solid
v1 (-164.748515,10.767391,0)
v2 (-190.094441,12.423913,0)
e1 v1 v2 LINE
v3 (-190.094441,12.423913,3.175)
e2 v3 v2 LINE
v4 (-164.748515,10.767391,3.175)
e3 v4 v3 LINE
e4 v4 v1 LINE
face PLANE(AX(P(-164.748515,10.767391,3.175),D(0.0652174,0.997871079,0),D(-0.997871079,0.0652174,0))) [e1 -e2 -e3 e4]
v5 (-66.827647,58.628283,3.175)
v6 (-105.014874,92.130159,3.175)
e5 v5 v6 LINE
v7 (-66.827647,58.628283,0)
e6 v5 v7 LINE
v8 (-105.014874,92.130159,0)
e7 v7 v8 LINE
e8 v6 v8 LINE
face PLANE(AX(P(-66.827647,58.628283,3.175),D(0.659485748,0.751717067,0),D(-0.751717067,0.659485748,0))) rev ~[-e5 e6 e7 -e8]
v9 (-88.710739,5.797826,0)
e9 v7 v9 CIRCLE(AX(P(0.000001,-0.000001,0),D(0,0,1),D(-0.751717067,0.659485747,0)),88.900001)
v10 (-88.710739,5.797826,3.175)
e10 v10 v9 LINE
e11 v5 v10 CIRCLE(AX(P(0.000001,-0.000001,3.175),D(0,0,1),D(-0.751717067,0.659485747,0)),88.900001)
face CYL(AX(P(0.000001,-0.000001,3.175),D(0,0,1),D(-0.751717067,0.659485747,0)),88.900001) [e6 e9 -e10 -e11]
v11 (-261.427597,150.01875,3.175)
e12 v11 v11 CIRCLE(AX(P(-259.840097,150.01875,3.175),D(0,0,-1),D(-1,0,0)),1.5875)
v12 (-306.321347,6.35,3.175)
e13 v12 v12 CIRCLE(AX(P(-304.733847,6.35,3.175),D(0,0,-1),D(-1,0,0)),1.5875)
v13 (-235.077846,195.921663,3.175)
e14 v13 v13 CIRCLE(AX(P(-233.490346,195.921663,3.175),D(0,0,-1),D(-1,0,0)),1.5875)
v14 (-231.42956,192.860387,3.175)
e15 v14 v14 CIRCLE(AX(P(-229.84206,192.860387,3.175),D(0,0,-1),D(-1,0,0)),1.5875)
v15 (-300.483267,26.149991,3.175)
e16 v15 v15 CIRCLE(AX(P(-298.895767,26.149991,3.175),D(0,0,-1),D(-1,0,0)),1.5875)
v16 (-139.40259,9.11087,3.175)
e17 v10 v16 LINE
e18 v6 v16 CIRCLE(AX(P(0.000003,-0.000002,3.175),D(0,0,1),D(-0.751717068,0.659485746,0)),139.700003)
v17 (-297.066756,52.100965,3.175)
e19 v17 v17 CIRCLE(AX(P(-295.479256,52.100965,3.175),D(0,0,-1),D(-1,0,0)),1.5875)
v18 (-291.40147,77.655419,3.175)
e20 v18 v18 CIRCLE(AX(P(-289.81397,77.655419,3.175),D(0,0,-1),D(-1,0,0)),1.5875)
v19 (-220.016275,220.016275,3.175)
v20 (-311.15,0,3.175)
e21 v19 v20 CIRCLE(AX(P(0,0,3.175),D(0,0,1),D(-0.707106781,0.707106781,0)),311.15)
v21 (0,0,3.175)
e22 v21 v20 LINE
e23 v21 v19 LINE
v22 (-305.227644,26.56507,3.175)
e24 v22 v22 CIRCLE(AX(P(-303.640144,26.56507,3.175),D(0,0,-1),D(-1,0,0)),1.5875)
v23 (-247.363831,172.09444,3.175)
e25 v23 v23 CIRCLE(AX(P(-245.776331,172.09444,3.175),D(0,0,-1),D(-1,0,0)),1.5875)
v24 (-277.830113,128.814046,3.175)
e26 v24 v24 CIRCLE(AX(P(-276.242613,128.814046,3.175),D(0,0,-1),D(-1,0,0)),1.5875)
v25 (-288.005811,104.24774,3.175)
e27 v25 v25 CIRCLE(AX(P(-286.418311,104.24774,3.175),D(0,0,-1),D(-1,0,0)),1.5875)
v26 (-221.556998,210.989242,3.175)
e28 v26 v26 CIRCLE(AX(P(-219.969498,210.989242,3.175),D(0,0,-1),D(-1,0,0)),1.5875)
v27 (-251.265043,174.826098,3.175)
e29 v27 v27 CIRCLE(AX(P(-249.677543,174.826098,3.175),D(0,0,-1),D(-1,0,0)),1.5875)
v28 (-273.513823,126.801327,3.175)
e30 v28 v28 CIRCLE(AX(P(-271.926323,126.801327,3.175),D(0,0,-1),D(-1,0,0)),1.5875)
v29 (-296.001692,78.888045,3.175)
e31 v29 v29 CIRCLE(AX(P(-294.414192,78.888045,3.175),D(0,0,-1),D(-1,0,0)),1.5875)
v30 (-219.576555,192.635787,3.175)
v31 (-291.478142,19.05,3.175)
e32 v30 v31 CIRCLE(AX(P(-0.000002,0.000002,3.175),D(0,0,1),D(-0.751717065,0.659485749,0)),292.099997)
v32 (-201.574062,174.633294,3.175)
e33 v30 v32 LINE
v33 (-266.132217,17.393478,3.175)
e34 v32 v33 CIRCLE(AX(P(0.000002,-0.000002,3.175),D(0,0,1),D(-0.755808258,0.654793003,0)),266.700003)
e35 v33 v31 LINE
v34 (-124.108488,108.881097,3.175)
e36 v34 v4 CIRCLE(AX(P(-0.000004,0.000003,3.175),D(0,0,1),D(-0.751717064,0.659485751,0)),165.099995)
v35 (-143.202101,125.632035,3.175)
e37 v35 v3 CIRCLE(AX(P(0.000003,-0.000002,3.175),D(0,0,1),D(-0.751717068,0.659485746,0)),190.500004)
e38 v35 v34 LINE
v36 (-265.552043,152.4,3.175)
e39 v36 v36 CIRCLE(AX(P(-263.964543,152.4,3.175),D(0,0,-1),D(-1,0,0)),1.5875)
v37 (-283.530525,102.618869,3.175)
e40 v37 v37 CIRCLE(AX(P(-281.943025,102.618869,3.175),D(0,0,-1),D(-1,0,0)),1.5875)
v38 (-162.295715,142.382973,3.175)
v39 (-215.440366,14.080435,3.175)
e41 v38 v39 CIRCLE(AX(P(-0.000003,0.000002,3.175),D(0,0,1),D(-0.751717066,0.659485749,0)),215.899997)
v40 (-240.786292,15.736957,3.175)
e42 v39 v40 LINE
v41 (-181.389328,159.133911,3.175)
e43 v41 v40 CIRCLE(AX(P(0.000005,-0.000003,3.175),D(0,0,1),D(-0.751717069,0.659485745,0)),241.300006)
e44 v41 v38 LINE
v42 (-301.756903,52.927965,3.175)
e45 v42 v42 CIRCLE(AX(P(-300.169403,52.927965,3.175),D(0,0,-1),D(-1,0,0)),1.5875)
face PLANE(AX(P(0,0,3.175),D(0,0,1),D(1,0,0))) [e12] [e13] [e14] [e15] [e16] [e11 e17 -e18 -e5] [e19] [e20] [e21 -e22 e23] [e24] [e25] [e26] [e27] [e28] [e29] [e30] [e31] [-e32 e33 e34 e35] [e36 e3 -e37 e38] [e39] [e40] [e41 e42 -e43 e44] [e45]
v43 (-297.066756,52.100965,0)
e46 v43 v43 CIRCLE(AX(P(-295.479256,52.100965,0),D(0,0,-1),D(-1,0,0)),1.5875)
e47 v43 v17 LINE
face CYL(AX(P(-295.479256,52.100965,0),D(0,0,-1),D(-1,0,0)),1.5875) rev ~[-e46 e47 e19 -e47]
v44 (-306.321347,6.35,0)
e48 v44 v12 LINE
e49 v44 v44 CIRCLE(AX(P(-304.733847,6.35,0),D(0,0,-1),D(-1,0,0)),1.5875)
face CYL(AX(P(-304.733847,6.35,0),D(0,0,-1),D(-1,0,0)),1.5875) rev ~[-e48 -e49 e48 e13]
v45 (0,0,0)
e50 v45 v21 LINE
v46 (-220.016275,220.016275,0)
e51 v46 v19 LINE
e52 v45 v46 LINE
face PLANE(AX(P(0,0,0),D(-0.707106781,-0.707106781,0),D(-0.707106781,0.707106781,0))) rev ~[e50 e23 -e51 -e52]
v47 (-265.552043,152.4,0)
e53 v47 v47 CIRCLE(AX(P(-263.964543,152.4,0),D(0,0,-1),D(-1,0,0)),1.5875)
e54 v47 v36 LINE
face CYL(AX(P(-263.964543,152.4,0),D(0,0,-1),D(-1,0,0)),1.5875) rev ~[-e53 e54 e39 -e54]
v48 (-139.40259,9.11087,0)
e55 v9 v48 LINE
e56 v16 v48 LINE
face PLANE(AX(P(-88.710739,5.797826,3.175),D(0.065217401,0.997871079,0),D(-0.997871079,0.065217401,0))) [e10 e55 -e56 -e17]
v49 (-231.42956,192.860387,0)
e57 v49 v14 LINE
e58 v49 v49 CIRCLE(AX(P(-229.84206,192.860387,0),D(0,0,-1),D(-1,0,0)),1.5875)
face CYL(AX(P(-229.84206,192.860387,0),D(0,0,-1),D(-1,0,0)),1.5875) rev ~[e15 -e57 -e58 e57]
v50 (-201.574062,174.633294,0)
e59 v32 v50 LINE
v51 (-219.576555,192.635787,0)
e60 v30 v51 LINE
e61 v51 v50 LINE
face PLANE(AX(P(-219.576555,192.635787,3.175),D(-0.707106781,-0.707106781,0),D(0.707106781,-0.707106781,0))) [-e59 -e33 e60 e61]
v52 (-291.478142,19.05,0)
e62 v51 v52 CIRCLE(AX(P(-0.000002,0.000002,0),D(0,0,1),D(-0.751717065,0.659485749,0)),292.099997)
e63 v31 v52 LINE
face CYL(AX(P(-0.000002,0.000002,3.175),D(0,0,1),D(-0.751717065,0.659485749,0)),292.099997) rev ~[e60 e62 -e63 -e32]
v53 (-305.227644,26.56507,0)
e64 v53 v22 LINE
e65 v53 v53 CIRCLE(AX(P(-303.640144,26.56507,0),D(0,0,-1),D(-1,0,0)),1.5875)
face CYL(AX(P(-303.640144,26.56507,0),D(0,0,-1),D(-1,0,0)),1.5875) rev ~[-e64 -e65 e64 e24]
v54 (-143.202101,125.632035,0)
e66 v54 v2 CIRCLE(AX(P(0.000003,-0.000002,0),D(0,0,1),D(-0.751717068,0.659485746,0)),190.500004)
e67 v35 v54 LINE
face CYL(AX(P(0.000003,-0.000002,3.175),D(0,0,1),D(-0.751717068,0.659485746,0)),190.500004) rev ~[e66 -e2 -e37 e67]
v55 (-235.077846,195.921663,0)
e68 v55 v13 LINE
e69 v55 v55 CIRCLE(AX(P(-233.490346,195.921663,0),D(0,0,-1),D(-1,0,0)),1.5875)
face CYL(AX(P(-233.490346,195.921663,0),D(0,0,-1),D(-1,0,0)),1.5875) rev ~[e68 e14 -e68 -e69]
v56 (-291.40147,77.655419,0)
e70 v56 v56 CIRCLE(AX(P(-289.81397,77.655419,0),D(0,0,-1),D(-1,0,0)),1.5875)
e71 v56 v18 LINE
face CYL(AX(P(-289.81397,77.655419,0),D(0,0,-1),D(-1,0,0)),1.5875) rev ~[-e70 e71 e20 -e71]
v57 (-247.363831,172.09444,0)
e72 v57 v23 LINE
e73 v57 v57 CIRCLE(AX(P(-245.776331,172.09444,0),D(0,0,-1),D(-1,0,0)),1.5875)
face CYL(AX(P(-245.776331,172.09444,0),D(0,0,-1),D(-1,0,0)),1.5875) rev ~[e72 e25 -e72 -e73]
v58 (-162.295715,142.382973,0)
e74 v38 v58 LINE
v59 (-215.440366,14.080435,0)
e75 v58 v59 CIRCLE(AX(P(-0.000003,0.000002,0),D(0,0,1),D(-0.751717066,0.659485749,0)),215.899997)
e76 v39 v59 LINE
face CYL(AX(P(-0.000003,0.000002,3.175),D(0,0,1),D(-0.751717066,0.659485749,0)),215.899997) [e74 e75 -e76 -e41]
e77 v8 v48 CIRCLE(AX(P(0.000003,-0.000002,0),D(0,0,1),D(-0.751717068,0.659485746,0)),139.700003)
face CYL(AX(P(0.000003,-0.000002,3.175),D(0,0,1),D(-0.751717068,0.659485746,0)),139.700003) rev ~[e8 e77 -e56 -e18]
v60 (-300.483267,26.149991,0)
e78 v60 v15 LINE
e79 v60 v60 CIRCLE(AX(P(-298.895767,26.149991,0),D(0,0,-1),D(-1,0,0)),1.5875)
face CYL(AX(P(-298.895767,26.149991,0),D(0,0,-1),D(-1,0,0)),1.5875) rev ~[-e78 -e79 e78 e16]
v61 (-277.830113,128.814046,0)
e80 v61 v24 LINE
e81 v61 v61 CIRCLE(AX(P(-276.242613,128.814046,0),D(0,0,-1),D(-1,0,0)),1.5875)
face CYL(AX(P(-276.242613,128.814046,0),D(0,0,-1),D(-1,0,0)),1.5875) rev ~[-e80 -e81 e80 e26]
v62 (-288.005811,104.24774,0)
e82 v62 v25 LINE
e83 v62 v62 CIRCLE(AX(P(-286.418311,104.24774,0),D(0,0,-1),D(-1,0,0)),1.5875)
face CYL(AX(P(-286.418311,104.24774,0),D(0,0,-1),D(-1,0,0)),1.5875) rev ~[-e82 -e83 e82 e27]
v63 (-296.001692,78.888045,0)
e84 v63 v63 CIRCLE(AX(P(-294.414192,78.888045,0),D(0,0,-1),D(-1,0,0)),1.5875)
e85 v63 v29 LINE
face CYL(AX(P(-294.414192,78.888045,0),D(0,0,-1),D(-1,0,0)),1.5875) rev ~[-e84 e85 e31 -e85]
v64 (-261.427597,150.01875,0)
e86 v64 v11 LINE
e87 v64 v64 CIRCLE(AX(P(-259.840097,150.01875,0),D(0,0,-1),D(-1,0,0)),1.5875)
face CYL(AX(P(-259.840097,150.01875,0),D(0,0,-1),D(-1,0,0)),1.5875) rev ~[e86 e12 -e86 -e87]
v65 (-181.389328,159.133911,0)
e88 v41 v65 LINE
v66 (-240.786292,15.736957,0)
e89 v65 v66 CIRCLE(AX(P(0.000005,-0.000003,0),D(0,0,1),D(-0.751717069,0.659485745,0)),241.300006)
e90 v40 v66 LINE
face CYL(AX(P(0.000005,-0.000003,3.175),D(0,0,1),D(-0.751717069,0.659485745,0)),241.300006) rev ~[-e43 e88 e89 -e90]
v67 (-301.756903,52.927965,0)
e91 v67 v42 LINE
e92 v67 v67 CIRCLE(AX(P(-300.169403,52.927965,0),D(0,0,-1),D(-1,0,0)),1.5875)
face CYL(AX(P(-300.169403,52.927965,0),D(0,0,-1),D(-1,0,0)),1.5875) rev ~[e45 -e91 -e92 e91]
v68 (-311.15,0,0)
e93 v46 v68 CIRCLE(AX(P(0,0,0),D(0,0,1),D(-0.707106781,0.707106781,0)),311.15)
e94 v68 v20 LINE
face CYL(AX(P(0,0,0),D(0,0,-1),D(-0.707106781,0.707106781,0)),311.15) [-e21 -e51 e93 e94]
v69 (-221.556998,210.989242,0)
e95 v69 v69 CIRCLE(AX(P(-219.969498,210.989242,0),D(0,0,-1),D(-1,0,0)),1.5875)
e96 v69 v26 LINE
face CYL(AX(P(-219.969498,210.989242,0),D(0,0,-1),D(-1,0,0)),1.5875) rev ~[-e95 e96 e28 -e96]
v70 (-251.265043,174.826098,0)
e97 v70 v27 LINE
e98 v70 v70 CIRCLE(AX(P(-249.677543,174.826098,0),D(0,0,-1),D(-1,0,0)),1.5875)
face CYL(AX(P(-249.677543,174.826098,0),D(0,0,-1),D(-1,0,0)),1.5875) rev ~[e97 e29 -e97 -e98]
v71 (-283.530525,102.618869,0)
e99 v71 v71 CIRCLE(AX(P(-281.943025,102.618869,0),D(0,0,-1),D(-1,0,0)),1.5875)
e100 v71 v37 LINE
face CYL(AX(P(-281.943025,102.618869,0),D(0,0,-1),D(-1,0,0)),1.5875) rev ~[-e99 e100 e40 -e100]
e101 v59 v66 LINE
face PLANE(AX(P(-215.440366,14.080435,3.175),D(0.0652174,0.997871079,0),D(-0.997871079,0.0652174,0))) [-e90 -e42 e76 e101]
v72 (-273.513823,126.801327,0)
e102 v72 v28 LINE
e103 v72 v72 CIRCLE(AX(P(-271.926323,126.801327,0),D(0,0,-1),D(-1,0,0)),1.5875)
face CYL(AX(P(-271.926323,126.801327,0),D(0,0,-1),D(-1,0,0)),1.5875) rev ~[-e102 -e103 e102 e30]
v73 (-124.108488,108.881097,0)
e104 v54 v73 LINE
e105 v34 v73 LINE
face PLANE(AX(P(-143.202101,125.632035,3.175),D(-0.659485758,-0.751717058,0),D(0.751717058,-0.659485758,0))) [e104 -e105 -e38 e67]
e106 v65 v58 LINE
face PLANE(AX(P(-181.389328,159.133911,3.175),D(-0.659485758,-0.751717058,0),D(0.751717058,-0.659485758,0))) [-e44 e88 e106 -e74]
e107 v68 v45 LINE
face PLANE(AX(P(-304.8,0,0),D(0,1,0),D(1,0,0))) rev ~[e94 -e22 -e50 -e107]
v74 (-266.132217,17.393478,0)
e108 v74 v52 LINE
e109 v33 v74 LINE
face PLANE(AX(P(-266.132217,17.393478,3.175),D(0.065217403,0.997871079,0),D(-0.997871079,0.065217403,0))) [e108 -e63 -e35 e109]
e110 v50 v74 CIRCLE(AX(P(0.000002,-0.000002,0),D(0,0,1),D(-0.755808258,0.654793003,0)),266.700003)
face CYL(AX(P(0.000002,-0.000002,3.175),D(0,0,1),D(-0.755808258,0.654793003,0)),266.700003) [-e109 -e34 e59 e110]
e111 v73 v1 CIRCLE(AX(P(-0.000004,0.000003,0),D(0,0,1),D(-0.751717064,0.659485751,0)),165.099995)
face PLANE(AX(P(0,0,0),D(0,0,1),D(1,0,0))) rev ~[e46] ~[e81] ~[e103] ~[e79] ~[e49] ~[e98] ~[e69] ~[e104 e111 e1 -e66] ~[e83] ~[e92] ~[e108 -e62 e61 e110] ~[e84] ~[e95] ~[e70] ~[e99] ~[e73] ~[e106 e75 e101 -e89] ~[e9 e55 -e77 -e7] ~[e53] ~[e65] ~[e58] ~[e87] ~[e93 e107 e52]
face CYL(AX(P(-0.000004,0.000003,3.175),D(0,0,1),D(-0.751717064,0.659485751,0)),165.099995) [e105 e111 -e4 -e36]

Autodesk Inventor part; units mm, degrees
ref_plane "YZ Plane" through (0, 0, 0) normal (1, 0, 0) x (0, 1, 0)
ref_plane "XZ Plane" through (0, 0, 0) normal (0, 1, 0) x (-1, 0, 0)
ref_plane "XY Plane" through (0, 0, 0) normal (0, 0, 1) x (1, 0, 0)
sketch "Sketch1" plane through (0, 0, 0) normal (0, 0, 1) x (1, 0, 0)
  arc A0 (-220.016275, 220.016275) -> (-311.15, 0) centre (0, 0) ccw
  line L0 (-311.15, 0) -> (-304.8, 0)
  line L1 (0, 0) -> (-220.016275, 220.016275)
  line L2 (-311.15, 0) -> (0, 0)
extrude "Extrusion1" add sketch "Sketch1" along normal blind 3.175
sketch "Sketch4" plane through (0, 0, 0) normal (0, 0, -1) x (-1, 0, 0)
  arc A0 (311.15, 0) -> (220.016275, 220.016275) centre (0, 0) ccw
  line L0 (220.016275, 220.016275) -> (0, 0)
  line L1 (0, 0) -> (311.15, 0)
  arc A1 (301.625, 0) -> (213.281083, 213.281083) centre (0, 0) ccw
  arc A2 (303.2125, 0) -> (214.403615, 214.403615) centre (0, 0) ccw
  arc A3 (304.8, 0) -> (215.526147, 215.526147) centre (0, 0) ccw construction
  arc A4 (300.0375, 0) -> (212.158551, 212.158551) centre (0, 0) ccw construction
  circle A5 centre (215.526147, 215.526147) radius 1.5875
  circle A6 centre (212.158551, 212.158551) radius 1.5875
  circle A7 centre (233.490346, 195.921663) radius 1.5875
  circle A8 centre (229.84206, 192.860387) radius 1.5875
  circle A9 centre (249.677543, 174.826098) radius 1.5875
  circle A10 centre (245.776331, 172.09444) radius 1.5875
  circle A11 centre (263.964543, 152.4) radius 1.5875
  circle A12 centre (259.840097, 150.01875) radius 1.5875
  circle A13 centre (276.242613, 128.814046) radius 1.5875
  circle A14 centre (271.926323, 126.801327) radius 1.5875
  circle A15 centre (286.418311, 104.24774) radius 1.5875
  circle A16 centre (281.943025, 102.618869) radius 1.5875
  circle A17 centre (294.414192, 78.888045) radius 1.5875
  circle A18 centre (289.81397, 77.655419) radius 1.5875
  circle A19 centre (300.169403, 52.927965) radius 1.5875
  circle A20 centre (295.479256, 52.100965) radius 1.5875
  circle A21 centre (303.640144, 26.56507) radius 1.5875
  circle A22 centre (298.895767, 26.149991) radius 1.5875
  circle A23 centre (304.8, 0) radius 1.5875
  circle A24 centre (300.0375, 0) radius 1.5875
  circle A25 centre (219.969498, 210.989242) radius 1.5875
  circle A26 centre (304.733847, 6.35) radius 1.5875
  point P0 (231.058155, 193.880813)
  point P1 (232.274251, 194.901238)
  point P2 (247.076735, 173.004993)
  point P3 (248.377139, 173.915545)
  point P4 (261.214912, 150.8125)
  point P5 (262.589728, 151.60625)
  point P6 (273.365086, 127.472233)
  point P7 (274.80385, 128.14314)
  point P8 (283.434787, 103.161826)
  point P9 (284.926549, 103.704783)
  point P10 (291.347377, 78.066294)
  point P11 (292.880785, 78.47717)
  point P12 (297.042639, 52.376632)
  point P13 (298.606021, 52.652298)
  point P14 (300.477226, 26.288351)
  point P15 (302.058685, 26.426711)
  point P16 (301.625, 0)
  point P17 (303.2125, 0)
  dimension "d2" = 9.525
  dimension "d3" = 1.5875
  dimension "d4" = 1.5875
  dimension "d5" = 1.5875
  dimension "d8" = 45
  dimension "d10" = 6.35
  dimension "d13" = 3.175
  dimension "d14" = 6.35
sketch "Sketch4 outline for Extrusion2" plane through (0, 0, 0) normal (0, 0, -1) x (-1, 0, 0)
  circle A0 centre (233.490346, 195.921663) radius 1.5875
  circle A1 centre (249.677543, 174.826098) radius 1.5875
  circle A2 centre (263.964543, 152.4) radius 1.5875
  circle A3 centre (276.242613, 128.814046) radius 1.5875
  circle A4 centre (286.418311, 104.24774) radius 1.5875
  circle A5 centre (294.414192, 78.888045) radius 1.5875
  circle A6 centre (300.169403, 52.927965) radius 1.5875
  circle A7 centre (303.640144, 26.56507) radius 1.5875
  circle A8 centre (219.969498, 210.989242) radius 1.5875
  circle A9 centre (304.733847, 6.35) radius 1.5875
  circle A10 centre (229.84206, 192.860387) radius 1.5875
  circle A11 centre (245.776331, 172.09444) radius 1.5875
  circle A12 centre (259.840097, 150.01875) radius 1.5875
  circle A13 centre (271.926323, 126.801327) radius 1.5875
  circle A14 centre (281.943025, 102.618869) radius 1.5875
  circle A15 centre (289.81397, 77.655419) radius 1.5875
  circle A16 centre (295.479256, 52.100965) radius 1.5875
  circle A17 centre (298.895767, 26.149991) radius 1.5875
extrude "Extrusion2" cut sketch "Sketch4 outline for Extrusion2" against normal blind 25.4
sketch "Sketch7" plane through (0, 0, 3.175) normal (0, 0, 1) x (1, 0, 0)
  line L0 (-219.576555, 192.635787) -> (-45.990768, 19.05)
  line L1 (-45.990768, 19.05) -> (-291.478142, 19.05)
  arc A0 (-99.872305, 72.931537) -> (-122.190768, 19.05) centre (-45.990768, 19.05) ccw
  dimension "d29" = 152.4
extrude "Extrusion4" add sketch "Sketch7" against normal blind 3.175
sketch "Sketch9" plane through (0, 0, 3.175) normal (0, 0, 1) x (1, 0, 0)
  arc A0 (-220.016275, 220.016275) -> (-311.15, 0) centre (0, 0) ccw
  line L0 (0, 0) -> (-220.016275, 220.016275)
  arc A1 (-219.576555, 192.635787) -> (-291.478142, 19.05) centre (0, 0) ccw
  arc A2 (-201.574062, 174.633294) -> (-266.132217, 17.393478) centre (0, 0) ccw
  arc A3 (-181.389328, 159.133911) -> (-240.786292, 15.736957) centre (0, 0) ccw
  arc A4 (-162.295715, 142.382973) -> (-215.440366, 14.080435) centre (0, 0) ccw
  arc A5 (-143.202101, 125.632035) -> (-190.094441, 12.423913) centre (0, 0) ccw
  arc A6 (-124.108488, 108.881097) -> (-164.748515, 10.767391) centre (0, 0) ccw
  arc A7 (-105.014874, 92.130159) -> (-139.40259, 9.11087) centre (0, 0) ccw
  arc A8 (-66.827647, 58.628283) -> (-88.710739, 5.797826) centre (0, 0) ccw
  line L1 (-219.576555, 192.635787) -> (-201.574062, 174.633294)
  line L2 (-266.132217, 17.393478) -> (-291.478142, 19.05)
  line L3 (-215.440366, 14.080435) -> (-240.786292, 15.736957)
  line L4 (-88.710739, 5.797826) -> (-139.40259, 9.11087)
  line L5 (-164.748515, 10.767391) -> (-190.094441, 12.423913)
  line L6 (-66.827647, 58.628283) -> (-105.014874, 92.130159)
  line L7 (-143.202101, 125.632035) -> (-124.108488, 108.881097)
  line L8 (-181.389328, 159.133911) -> (-162.295715, 142.382973)
  dimension "d34" = 19.05
  dimension "d35" = 25.4
  dimension "d36" = 25.4
  dimension "d38" = 25.4
  dimension "d39" = 25.4
  dimension "d40" = 25.4
  dimension "d41" = 25.4
extrude "Extrusion5" cut sketch "Sketch9" against normal blind 3.175
properties part number "Side Panel" material "Polycarbonate, Clear"
